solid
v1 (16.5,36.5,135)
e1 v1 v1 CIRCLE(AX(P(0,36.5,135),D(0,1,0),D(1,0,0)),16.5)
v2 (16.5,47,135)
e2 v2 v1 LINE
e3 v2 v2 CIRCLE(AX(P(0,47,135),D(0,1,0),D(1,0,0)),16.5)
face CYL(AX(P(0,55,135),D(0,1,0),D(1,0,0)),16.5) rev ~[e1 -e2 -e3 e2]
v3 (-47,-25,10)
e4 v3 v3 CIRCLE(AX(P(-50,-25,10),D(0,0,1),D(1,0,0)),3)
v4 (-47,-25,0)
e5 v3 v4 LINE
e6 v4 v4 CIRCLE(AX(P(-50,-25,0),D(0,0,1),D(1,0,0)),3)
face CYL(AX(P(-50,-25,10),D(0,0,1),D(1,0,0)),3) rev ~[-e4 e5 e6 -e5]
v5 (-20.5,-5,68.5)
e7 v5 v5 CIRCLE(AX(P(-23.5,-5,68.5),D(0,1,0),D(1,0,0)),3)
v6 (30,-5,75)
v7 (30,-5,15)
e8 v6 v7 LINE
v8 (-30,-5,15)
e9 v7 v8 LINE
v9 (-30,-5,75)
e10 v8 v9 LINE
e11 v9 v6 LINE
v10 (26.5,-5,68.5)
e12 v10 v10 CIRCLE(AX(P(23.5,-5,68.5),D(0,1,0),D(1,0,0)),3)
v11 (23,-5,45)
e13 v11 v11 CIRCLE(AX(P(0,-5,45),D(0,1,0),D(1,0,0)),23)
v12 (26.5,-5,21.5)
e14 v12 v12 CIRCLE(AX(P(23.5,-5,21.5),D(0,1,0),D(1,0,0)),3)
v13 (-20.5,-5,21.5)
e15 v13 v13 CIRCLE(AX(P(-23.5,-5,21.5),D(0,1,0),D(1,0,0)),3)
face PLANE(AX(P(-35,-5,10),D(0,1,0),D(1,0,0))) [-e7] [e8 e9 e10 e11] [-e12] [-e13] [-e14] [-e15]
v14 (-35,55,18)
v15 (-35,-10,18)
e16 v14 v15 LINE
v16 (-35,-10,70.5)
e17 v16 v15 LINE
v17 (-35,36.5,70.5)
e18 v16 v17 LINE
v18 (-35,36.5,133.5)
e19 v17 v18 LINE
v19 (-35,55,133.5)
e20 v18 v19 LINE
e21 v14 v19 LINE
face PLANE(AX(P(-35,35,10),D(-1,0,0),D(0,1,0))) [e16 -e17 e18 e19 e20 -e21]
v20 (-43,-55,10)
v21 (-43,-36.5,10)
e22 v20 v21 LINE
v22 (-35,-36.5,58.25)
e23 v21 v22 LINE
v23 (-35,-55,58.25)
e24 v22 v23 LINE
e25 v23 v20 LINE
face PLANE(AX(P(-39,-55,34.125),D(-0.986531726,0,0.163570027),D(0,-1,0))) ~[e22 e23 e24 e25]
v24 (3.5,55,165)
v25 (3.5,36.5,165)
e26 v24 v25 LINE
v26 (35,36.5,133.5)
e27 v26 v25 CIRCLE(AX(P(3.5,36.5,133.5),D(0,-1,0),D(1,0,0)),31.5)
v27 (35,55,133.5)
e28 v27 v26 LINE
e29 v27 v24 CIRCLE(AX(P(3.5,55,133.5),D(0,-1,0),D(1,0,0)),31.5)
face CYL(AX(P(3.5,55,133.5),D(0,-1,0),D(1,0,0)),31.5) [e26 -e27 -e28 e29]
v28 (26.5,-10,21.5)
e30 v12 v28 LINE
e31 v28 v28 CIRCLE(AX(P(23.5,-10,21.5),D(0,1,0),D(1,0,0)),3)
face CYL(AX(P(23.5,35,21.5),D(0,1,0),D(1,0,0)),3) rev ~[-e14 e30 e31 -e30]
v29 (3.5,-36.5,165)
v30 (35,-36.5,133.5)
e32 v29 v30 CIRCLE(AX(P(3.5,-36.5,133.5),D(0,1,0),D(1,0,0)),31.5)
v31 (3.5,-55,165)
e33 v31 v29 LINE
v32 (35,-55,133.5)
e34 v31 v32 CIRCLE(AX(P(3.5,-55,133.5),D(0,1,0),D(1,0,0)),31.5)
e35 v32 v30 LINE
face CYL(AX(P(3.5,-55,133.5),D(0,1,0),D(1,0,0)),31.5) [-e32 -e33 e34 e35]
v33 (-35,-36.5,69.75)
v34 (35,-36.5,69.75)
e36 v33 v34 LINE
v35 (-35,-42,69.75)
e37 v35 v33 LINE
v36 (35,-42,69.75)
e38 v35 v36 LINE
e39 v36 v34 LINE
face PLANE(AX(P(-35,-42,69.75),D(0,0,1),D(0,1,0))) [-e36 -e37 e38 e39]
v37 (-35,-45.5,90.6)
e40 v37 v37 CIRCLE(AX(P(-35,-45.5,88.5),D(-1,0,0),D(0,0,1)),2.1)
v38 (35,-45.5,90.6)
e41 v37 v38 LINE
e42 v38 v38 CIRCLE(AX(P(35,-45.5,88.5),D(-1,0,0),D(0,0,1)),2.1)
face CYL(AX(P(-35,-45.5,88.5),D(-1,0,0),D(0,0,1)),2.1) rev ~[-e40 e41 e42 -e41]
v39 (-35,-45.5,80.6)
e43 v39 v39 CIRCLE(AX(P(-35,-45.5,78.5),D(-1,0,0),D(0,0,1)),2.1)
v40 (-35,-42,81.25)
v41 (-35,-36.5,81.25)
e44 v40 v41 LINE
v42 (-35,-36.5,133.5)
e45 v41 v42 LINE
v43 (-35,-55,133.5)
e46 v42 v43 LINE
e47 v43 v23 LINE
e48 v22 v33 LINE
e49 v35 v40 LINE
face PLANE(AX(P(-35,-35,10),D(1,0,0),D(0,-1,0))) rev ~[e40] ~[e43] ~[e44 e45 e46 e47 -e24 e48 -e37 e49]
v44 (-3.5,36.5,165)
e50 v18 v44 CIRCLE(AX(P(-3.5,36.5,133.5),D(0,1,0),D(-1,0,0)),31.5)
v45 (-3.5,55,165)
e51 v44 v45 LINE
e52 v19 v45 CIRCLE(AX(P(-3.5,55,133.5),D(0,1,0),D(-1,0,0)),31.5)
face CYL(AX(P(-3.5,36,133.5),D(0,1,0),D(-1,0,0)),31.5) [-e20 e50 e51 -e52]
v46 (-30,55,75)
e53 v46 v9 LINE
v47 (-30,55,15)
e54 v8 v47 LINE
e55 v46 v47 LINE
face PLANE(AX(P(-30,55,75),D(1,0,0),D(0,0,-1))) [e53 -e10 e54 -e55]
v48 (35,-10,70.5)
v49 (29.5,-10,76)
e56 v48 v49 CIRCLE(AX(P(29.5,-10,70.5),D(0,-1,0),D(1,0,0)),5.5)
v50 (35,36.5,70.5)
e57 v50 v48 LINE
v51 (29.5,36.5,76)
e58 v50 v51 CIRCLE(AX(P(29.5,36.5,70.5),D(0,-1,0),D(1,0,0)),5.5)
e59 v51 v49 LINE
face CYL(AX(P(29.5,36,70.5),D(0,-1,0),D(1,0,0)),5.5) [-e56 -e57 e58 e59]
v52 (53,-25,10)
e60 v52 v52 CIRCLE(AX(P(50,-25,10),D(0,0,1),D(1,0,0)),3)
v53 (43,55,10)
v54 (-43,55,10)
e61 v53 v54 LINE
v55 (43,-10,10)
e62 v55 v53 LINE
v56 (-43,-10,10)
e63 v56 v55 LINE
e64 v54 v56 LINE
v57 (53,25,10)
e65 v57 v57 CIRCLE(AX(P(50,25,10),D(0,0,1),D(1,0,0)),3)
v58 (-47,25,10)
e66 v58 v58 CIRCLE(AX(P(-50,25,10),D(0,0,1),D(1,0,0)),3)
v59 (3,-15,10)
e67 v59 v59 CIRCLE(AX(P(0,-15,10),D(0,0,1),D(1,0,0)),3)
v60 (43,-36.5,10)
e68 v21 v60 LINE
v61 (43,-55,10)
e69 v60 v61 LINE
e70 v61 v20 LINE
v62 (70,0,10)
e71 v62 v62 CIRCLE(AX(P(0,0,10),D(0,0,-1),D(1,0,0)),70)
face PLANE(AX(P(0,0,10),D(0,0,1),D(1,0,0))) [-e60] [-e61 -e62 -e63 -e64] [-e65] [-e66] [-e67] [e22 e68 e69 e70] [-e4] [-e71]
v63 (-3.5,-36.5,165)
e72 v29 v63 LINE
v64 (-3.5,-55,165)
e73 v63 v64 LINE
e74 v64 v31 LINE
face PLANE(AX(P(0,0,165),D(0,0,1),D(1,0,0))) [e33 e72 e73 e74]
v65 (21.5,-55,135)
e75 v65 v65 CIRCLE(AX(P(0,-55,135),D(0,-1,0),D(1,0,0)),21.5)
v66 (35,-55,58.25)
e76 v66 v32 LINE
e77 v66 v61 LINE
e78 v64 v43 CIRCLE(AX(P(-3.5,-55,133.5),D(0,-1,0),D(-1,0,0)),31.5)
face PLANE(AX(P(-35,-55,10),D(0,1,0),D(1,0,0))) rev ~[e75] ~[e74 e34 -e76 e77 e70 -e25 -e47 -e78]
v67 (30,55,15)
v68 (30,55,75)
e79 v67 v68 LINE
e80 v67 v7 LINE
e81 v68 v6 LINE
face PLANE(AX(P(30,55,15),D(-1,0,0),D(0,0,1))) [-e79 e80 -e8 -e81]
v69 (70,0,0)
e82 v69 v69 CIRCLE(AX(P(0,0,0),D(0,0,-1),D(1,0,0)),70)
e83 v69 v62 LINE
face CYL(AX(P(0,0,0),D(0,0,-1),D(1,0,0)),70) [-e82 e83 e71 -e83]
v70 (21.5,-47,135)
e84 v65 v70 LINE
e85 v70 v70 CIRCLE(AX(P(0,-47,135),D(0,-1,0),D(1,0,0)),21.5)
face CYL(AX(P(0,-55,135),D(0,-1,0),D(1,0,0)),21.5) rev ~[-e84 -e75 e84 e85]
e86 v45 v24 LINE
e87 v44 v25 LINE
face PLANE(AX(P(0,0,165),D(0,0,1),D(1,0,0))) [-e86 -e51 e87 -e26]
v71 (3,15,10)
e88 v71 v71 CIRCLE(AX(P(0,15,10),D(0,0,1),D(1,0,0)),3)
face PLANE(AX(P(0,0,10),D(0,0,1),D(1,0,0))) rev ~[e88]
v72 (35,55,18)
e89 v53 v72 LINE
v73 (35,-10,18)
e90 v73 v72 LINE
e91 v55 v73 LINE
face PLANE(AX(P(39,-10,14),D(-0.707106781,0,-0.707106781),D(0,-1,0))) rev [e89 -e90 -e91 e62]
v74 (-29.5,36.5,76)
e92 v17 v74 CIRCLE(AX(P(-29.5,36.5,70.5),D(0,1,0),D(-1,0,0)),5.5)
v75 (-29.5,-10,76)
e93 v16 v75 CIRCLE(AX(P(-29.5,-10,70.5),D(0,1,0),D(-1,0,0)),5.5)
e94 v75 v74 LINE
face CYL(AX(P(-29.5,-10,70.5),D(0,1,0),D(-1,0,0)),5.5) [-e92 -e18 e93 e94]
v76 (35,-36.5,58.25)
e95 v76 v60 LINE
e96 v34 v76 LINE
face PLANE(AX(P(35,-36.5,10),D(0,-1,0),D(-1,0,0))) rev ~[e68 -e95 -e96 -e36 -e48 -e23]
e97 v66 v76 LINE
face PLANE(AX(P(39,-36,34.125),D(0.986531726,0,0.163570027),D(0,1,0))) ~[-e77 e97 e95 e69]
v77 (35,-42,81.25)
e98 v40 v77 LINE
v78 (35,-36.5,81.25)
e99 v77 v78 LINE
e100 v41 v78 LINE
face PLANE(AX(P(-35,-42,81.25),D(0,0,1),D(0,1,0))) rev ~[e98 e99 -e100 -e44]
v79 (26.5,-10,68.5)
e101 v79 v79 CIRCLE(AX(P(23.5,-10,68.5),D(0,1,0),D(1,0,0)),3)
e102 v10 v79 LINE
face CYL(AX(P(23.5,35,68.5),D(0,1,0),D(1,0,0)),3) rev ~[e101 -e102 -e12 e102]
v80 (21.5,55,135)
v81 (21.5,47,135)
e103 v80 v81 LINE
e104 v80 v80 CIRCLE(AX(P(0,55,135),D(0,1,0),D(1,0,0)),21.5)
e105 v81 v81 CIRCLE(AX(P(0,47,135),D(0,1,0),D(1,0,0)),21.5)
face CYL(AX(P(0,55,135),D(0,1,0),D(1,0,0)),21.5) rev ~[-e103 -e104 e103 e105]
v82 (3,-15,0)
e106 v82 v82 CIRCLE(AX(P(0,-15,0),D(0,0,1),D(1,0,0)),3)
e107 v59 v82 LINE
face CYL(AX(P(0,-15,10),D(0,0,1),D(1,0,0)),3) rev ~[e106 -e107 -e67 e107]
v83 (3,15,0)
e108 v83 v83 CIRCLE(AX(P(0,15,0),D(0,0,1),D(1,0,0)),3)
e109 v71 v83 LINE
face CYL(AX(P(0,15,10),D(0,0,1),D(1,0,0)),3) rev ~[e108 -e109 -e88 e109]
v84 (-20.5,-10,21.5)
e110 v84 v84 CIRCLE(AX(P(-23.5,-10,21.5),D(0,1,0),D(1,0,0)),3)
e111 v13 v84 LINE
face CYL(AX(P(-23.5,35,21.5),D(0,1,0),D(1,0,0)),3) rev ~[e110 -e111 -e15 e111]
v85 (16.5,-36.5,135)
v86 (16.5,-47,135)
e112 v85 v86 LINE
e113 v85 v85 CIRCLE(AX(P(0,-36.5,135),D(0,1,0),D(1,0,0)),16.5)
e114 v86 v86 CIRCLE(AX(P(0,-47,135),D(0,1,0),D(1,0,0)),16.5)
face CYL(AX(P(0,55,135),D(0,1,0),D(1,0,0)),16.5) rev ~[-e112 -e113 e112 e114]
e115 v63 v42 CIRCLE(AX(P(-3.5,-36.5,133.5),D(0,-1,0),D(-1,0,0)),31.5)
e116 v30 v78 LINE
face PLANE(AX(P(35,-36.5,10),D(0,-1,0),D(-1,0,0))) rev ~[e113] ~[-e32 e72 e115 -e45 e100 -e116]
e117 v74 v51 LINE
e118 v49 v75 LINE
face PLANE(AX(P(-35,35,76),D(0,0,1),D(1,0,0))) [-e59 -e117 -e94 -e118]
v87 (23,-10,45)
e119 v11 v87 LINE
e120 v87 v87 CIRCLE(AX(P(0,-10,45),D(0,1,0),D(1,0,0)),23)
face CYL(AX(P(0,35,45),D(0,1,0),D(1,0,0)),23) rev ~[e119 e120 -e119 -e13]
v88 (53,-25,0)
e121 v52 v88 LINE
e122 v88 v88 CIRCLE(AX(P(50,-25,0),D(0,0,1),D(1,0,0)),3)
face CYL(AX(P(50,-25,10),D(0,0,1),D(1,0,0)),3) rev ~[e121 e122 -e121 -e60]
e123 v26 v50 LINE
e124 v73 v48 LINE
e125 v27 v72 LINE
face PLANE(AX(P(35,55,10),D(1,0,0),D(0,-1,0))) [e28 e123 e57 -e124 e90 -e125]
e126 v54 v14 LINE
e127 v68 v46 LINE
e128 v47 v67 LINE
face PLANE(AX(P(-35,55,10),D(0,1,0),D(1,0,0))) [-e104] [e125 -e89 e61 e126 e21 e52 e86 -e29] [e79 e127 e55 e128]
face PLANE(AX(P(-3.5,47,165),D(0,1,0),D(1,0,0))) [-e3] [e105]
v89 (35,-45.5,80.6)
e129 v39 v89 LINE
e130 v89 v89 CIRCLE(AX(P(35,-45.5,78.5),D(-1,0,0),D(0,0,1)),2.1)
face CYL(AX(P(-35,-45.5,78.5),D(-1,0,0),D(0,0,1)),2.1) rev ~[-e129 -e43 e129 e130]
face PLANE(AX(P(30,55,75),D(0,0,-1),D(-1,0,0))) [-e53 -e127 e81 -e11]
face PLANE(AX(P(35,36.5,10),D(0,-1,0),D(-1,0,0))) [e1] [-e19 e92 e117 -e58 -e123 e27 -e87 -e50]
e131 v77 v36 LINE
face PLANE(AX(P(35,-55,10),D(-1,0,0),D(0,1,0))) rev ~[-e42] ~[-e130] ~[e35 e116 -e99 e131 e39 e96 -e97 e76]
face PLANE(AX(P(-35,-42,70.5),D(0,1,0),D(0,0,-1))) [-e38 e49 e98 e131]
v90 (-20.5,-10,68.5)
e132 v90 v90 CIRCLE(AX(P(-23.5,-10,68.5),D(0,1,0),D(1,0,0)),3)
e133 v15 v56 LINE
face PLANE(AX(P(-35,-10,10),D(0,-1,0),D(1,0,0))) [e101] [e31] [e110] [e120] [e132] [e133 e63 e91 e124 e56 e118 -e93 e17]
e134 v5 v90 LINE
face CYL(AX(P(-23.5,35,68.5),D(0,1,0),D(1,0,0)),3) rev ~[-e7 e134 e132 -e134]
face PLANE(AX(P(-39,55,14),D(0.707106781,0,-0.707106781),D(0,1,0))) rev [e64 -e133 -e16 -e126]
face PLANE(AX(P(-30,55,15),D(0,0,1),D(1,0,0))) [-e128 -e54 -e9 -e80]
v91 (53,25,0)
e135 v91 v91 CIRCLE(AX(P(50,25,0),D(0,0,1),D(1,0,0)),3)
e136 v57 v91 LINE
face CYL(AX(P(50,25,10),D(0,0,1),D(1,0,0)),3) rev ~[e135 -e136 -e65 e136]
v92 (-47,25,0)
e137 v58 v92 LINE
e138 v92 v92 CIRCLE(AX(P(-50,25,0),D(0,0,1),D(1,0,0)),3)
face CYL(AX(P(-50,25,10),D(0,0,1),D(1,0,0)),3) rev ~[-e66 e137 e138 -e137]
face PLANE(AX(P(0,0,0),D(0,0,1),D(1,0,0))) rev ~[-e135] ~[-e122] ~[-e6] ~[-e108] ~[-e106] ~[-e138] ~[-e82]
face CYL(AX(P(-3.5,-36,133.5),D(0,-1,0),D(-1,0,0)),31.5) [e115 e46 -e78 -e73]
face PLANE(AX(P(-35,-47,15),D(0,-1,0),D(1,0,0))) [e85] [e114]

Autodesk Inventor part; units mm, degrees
ref_plane "YZ Plane" through (0, 0, 0) normal (1, 0, 0) x (0, 1, 0)
ref_plane "XZ Plane" through (0, 0, 0) normal (0, 1, 0) x (-1, 0, 0)
sketch "Sketch1" plane through (0, 0, 0) normal (0, 0, 1) x (1, 0, 0)
  circle A0 centre (0, 0) radius 70
  dimension "d0" = 140
extrude "Extrusion1" add sketch "Sketch1" along normal blind 10
sketch "Sketch2" plane through (0, 0, 10) normal (0, 0, 1) x (1, 0, 0)
  line L0 (-35, -55) -> (35, -55)
  line L1 (35, -55) -> (35, -35)
  line L2 (35, -35) -> (-35, -35)
  line L3 (-35, -35) -> (-35, -55)
  line L4 (35, 35) -> (-35, 35)
  line L5 (-35, 35) -> (-35, 55)
  line L6 (-35, 55) -> (35, 55)
  line L7 (35, 55) -> (35, 35)
  circle A0 centre (0, 0) radius 70 projected
  line L8 (-35, -35) -> (-60.6218, -35)
  line L9 (35, 35) -> (60.6218, 35)
  line L10 (-35, 35) -> (-60.6218, 35)
  line L11 (35, -35) -> (60.6218, -35)
  dimension "d3" = 35
  dimension "d4" = 35
  dimension "d5" = 20
  dimension "d6" = 70
  dimension "d7" = 35
extrude "Extrusion2" add sketch "Sketch2" along normal blind 155 contours L3 L2 L1 L0 | L5 L6 L7 L4
sketch "Sketch4" plane through (-35, 35, 10) normal (0, -1, 0) x (1, 0, 0)
  line L0 (70, 0) -> (70, 155) projected
  line L1 (0, 66) -> (70, 66)
  line L2 (70, 66) -> (70, 0)
  line L3 (70, 0) -> (0, 0)
  line L4 (0, 0) -> (0, 66)
  line L5 (0, 66) -> (70, 0) construction
  line L6 (70, 66) -> (0, 0) construction
  circle A0 centre (58.5, 11.5) radius 3 projected
  circle A1 centre (58.5, 58.5) radius 3 projected
  circle A2 centre (11.5, 11.5) radius 3 projected
  circle A3 centre (11.5, 58.5) radius 3 projected
  line L7 (62.5, 62.5) -> (7.5, 62.5) projected
  line L8 (7.5, 62.5) -> (7.5, 7.5) projected
  line L9 (7.5, 7.5) -> (62.5, 7.5) projected
  line L10 (62.5, 7.5) -> (62.5, 62.5) projected
  circle A4 centre (35, 35) radius 20 projected
  circle A5 centre (35, 35) radius 23
  point P0 (35, -10)
  dimension "d77" = 3
extrude "Extrusion4" add sketch "Sketch4" along normal blind 45 contours L3 L4 L1 L0 | L10 L9 L8 L7
sketch "Sketch3" plane through (-35, 55, 10) normal (0, 1, 0) x (1, 0, 0)
  line L0 (65, -65) -> (5, -65)
  line L1 (5, -65) -> (5, -5)
  line L2 (5, -5) -> (65, -5)
  line L3 (65, -5) -> (65, -65)
  line L4 (-35, 0) -> (105, 0) projected
  line L5 (70, 0) -> (70, -155) projected
  line L6 (35, 0) -> (35, -1.4267)
  point P0 (35, 10)
  dimension "d10" = 60
  dimension "d11" = 60
  dimension "d12" = 5
extrude "Extrusion3" cut sketch "Sketch3" against normal blind 60
sketch "Sketch5" plane through (-35, 55, 165) normal (0, 1, 0) x (1, 0, 0)
  circle A0 centre (35, 30) radius 13.5
  line L0 (70, 155) -> (70, 0) projected
  line L1 (70, 0) -> (0, 0) projected
  circle A1 centre (35, 30) radius 16.5
  point P0 (35, 165)
  point P1 (70, 125)
  point P2 (70, 69)
  dimension "d28" = 35
  dimension "d29" = 30
  dimension "d40" = 27
  dimension "d84" = 3
extrude "Extrusion5" cut sketch "Sketch5" against normal through all contours A0 | A1
ref_plane "Work Plane2" through (-35, -55, 15) normal (0, -1, 0) x (1, 0, 0)
sketch "Sketch6" plane through (-35, -55, 15) normal (0, -1, 0) x (1, 0, 0)
  circle A0 centre (35, 120) radius 13.5
  circle A1 centre (35, 120) radius 21.5
  circle A2 centre (35, 120) radius 13.5 projected
  point P0 (35, -15)
  dimension "d35" = 8
extrude "Extrusion6" cut sketch "Sketch6" against normal blind 8
ref_plane "Work Plane1" through (-40, 0, 10) normal (0, 1, 0) x (1, 0, 0)
offset faces "Size1" outward -1 faces at (0.663, -35, 46.2068) (-0.663, 35, 90.2068)
fillet "Fillet1" radius 31.5 4 edges at (-35, -45.5, 165) (35, -45.5, 165) (-35, 45.5, 165) (35, 45.5, 165)
sketch "Sketch7" plane through (0, 0, 10) normal (0, 0, 1) x (1, 0, 0)
  circle A0 centre (-50, 25) radius 3
  circle A1 centre (-50, -25) radius 3
  circle A2 centre (50, -25) radius 3
  circle A3 centre (50, 25) radius 3
  circle A4 centre (0, 15) radius 3
  circle A5 centre (0, -15) radius 3
  line L0 (-98, 0) -> (98, 0) projected
  line L1 (0, 0) -> (0, 59.6277)
  dimension "d41" = 25
  dimension "d42" = 25
  dimension "d43" = 50
  dimension "d44" = 50
  dimension "d45" = 15
  dimension "d46" = 15
  dimension "d47" = 25
  dimension "d48" = 25
  dimension "d49" = 50
  dimension "d50" = 50
  dimension "d51" = 6
extrude "Extrusion7" cut sketch "Sketch7" against normal through all
fillet "Fillet2" radius 5.5 2 edges at (35, 13, 76) (-35, 13, 76)
ref_plane "Work Plane4" through (-35, -55, 15) normal (-1, 0, 0) x (0, 0, 1)
sketch "Sketch8" plane through (-35, -55, 15) normal (-1, 0, 0) x (0, 0, 1)
  line L0 (118.5, 19) -> (118.5, 0) projected
  line L1 (-5, 19) -> (118.5, 19) projected
  line L2 (-5, 0) -> (118.5, 0) projected
  circle A0 centre (73.5, 9.5) radius 2.1
  circle A1 centre (63.5, 9.5) radius 2.1
  line L3 (-5, 0) -> (-5, 19) projected
  point P0 (-15, 55)
  dimension "d55" = 10
  dimension "d56" = 4.2
  dimension "d57" = 9.5
  dimension "d58" = 45
extrude "Extrusion8" cut sketch "Sketch8" against normal through all contours A0 | A1
chamfer "Chamfer4" distance 8 distance2 48.25 2 edges at (35, -45.5, 10) (-35, -45.5, 10) measured on face at (0.1205, -29.9927, 10)
chamfer "Chamfer5" distance 8 angle 45 2 edges at (35, 22.5, 10) (-35, 22.5, 10)
move faces "Move1" translate (0, 0.5, 0) faces at (0.663, 36, 90.2068)
move faces "Move2" translate (0, -0.5, 0) faces at (0.663, -36, 78.3734)
sketch "Sketch10" plane through (-3.5, 55, 165) normal (0, 1, 0) x (1, 0, 0)
  circle A0 centre (3.5, 30) radius 13.5 projected
  circle A1 centre (3.5, 30) radius 19
  circle A2 centre (3.5, 30) radius 21.5
  circle A3 centre (3.5, 30) radius 15.5
  point P0 (3.5, 165)
  dimension "d73" = 38
  dimension "d74" = 43
  dimension "d83" = 2
extrude "Extrusion9" cut sketch "Sketch10" against normal blind 8 contours A0 | A1 | A2 | A3
sketch "Sketch11" plane through (-35, -55, 58.25) normal (-1, 0, 0) x (0, 0, 1)
  line L0 (0, 18.5) -> (75.25, 18.5) projected
  line L1 (12.25, 16) -> (12.25, 34.5) projected
  line L2 (22.25, 16) -> (12.25, 16) projected
  line L3 (22.25, 34.5) -> (22.25, 16) projected
  line L4 (12.25, 34.5) -> (22.25, 34.5) projected
  circle A0 centre (17.25, 25.5) radius 3.2 projected
  line L5 (22.25, 16) -> (12.25, 16)
  line L6 (12.25, 16) -> (12.25, 13)
  line L7 (12.25, 13) -> (22.25, 13)
  line L8 (22.25, 13) -> (22.25, 16)
  line L9 (22.25, 13) -> (23, 13)
  line L10 (23, 13) -> (23, 18.5)
  line L11 (23, 18.5) -> (22.25, 18.5)
  line L12 (22.25, 18.5) -> (22.25, 13)
  line L13 (12.25, 13) -> (11.5, 13)
  line L14 (11.5, 13) -> (11.5, 18.5)
  line L15 (11.5, 18.5) -> (12.25, 18.5)
  line L16 (12.25, 18.5) -> (12.25, 13)
  point P0 (-58.25, 55)
  dimension "d78" = 3
  dimension "d79" = 0.75
  dimension "d80" = 0.75
extrude "Extrusion10" cut sketch "Sketch11" against normal through all contours L0 L1 L6 L13 L14 | L0 L3 L2 L1 | L0 L10 L9 L8 L3 | L2 L8 L7 L6
equation "\"d3\" = 0.5 * base_arm_widht"
equation "\"d4\" = 0.5 * base_arm_widht"
equation "\"base_arm_widht\" = 70"
properties part number "base_3DPrint"
